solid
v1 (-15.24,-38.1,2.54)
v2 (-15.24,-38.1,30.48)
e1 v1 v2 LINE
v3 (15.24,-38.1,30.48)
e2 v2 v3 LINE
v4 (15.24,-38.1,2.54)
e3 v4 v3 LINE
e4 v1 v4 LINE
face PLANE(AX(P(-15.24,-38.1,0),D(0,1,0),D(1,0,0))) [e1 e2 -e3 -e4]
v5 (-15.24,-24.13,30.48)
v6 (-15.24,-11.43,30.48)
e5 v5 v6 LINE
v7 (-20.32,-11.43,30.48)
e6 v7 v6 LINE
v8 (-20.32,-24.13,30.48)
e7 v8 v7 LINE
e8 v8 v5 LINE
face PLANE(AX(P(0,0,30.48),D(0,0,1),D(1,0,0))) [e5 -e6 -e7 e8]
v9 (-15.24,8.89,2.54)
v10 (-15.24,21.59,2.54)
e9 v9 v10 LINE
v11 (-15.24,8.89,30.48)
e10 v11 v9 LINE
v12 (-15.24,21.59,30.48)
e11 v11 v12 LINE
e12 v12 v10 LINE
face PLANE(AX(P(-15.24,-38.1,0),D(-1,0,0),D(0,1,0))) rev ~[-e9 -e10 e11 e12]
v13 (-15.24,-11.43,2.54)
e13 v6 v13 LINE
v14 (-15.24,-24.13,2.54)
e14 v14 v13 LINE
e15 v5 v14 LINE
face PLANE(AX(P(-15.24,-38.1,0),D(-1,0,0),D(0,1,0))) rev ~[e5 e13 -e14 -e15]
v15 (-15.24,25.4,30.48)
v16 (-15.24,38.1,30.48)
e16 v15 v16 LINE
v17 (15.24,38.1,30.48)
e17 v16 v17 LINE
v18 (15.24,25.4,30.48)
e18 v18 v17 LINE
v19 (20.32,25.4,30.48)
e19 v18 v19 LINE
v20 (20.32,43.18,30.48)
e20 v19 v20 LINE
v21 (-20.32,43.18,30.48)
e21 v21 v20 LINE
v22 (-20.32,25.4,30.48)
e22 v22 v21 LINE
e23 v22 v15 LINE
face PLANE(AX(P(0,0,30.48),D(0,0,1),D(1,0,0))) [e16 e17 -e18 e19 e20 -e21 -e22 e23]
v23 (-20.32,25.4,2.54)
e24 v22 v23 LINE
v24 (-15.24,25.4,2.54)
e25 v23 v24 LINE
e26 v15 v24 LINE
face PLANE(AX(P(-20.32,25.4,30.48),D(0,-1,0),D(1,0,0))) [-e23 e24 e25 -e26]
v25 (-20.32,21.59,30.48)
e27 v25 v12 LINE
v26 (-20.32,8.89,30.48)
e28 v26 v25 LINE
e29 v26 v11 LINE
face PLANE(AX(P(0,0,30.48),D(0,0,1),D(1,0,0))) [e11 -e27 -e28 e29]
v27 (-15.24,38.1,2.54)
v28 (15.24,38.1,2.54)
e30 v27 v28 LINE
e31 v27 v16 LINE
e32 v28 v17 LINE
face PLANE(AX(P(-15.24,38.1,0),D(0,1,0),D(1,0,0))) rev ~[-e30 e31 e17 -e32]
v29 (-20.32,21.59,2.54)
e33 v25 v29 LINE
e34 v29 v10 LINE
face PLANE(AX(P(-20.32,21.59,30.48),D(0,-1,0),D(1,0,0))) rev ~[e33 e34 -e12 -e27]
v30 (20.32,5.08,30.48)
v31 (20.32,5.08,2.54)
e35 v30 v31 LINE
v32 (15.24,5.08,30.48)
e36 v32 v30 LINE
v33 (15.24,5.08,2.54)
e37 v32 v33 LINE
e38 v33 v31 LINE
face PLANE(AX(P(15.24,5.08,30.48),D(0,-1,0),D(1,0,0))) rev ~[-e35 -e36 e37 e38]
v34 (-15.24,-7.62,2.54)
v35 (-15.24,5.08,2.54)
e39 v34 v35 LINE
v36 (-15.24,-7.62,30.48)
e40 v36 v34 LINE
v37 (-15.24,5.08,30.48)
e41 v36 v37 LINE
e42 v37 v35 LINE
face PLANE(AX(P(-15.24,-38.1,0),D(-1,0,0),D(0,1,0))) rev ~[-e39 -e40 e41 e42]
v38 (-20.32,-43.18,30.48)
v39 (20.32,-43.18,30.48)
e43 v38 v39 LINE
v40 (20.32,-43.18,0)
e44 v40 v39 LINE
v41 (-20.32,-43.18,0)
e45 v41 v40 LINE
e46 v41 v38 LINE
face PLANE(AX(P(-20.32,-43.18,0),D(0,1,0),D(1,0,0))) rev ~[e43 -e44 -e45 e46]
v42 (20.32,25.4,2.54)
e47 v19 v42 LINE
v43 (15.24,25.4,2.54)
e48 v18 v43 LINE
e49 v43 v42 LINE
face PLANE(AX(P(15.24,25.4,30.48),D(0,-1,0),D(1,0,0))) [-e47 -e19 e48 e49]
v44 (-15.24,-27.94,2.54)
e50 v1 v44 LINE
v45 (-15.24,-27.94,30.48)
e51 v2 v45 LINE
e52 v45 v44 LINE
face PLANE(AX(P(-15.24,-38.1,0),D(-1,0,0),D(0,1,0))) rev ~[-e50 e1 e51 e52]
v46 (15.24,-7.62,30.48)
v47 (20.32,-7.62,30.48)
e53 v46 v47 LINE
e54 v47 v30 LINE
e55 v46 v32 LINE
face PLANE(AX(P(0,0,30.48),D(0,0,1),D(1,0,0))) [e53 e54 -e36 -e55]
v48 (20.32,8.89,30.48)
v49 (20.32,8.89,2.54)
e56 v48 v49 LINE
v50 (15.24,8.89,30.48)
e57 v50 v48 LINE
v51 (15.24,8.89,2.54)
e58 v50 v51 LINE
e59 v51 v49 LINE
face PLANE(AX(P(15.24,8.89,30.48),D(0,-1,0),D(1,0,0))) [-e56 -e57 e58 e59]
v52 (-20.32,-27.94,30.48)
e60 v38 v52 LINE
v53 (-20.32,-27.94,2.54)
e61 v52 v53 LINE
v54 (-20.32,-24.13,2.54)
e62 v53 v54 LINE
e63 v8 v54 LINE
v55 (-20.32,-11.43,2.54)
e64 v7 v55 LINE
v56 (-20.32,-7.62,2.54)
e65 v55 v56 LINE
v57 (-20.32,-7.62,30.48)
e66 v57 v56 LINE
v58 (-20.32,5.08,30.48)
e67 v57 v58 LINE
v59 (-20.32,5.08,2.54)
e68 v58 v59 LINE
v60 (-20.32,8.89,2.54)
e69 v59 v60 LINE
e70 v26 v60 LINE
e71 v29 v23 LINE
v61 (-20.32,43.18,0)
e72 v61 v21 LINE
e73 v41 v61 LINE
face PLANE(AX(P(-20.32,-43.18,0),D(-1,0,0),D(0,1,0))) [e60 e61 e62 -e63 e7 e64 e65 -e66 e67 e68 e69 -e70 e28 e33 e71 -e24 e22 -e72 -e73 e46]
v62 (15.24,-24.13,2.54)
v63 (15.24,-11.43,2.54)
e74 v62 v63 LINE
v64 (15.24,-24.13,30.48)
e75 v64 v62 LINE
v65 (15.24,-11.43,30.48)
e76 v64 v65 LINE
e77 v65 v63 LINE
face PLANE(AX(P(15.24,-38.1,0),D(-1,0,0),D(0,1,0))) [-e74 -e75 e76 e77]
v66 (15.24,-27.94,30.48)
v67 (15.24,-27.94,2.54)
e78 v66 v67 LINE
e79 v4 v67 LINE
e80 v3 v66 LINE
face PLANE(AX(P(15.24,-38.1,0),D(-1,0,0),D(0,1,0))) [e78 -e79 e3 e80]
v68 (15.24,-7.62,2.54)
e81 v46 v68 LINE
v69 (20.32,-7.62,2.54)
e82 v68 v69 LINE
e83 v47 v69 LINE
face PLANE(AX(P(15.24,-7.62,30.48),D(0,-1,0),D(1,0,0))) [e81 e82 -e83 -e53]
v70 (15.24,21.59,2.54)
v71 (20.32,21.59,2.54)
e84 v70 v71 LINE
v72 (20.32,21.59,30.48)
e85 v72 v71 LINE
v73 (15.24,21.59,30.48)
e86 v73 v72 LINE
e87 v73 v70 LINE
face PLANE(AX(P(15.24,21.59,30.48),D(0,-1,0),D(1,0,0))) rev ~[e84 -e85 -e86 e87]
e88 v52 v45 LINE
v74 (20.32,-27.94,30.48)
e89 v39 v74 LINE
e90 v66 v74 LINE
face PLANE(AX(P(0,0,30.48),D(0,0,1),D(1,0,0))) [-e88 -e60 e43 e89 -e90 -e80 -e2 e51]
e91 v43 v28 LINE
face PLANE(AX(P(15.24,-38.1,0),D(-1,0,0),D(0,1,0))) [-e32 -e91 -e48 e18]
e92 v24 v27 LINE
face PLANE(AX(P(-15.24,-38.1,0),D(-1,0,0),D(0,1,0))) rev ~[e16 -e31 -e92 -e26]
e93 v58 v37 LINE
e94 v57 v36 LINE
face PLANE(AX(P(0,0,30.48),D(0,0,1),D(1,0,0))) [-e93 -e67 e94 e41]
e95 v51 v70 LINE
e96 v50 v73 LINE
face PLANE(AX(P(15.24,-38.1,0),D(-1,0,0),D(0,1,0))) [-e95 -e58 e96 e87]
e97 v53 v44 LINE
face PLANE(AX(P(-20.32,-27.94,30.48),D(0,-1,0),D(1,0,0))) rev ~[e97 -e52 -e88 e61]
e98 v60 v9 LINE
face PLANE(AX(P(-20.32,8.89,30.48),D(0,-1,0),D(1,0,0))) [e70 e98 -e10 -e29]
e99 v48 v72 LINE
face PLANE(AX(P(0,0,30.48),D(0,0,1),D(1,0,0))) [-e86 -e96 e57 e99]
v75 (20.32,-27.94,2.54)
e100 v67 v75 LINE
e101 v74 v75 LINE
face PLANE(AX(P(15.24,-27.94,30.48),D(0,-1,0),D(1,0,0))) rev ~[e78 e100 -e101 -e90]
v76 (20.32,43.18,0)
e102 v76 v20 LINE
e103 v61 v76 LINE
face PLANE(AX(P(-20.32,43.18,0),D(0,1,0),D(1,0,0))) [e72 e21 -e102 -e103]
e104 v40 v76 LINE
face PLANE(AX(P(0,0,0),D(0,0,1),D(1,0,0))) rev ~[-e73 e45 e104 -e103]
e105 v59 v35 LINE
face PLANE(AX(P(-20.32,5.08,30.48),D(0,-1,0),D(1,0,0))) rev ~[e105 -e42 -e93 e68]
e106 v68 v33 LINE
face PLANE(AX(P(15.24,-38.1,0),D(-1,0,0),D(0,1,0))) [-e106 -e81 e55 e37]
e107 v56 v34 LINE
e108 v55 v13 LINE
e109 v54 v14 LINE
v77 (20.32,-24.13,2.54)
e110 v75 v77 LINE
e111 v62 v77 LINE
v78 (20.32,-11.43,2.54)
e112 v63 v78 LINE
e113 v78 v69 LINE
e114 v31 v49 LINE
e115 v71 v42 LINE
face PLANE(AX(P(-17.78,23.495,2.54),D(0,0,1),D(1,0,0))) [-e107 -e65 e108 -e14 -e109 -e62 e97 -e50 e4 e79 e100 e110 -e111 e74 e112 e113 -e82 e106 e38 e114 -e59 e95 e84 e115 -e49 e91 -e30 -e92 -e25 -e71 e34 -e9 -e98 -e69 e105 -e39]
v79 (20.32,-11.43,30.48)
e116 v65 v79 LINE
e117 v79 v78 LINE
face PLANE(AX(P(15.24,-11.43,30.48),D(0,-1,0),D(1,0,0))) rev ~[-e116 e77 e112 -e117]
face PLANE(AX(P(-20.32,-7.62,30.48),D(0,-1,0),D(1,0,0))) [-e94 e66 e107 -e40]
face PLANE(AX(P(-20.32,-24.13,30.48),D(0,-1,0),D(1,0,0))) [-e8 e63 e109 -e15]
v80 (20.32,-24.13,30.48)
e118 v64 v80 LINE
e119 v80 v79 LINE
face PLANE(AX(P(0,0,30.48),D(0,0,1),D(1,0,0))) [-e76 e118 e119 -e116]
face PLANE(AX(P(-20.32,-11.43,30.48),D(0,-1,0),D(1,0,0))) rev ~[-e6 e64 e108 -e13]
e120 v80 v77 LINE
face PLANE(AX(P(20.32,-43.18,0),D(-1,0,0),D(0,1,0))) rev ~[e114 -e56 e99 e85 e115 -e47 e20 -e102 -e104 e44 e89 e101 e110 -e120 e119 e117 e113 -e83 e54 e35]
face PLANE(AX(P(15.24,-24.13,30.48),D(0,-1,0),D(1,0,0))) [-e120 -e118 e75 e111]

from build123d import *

# Parameters (mm, degrees)
F0_W     = 40.64
F0_H     = 86.36
F0_W_2   = 30.48
F0_H_2   = 76.2
F1_DEPTH = 30.48
F2_DEPTH = 2.54
F3_W     = 5.08
F3_H     = 3.81
F4_DEPTH = 27.94


# Not quite as in the source:
# - a feature names something its author has since deleted; it is built from what else it names


with BuildPart() as f1:
    # F0 (on Top) → F1 (new body)
    with BuildSketch(Plane.XY):
        Rectangle(F0_W, F0_H)
        Rectangle(F0_W_2, F0_H_2, mode=Mode.SUBTRACT)
    extrude(amount=F1_DEPTH)

    # F0 (on Top) → F2 (join)
    with BuildSketch(Plane.XY):
        Rectangle(F0_W_2, F0_H_2)
    extrude(amount=F2_DEPTH)

    # F3 (on face) → F4 (cut)
    with BuildSketch(Plane.XY.offset(30.48)):
        with Locations((-17.78, 23.495)):
            Rectangle(F3_W, F3_H)
        with Locations((17.78, 23.495)):
            Rectangle(F3_W, F3_H)
        with Locations((17.78, 6.985)):
            Rectangle(F3_W, F3_H)
        with Locations((-17.78, 6.985)):
            Rectangle(F3_W, F3_H)
        with Locations((-17.78, -9.525)):
            Rectangle(F3_W, F3_H)
        with Locations((17.78, -9.525)):
            Rectangle(F3_W, F3_H)
        with Locations((-17.78, -26.035)):
            Rectangle(F3_W, F3_H)
        with Locations((17.78, -26.035)):
            Rectangle(F3_W, F3_H)
    extrude(amount=-F4_DEPTH, mode=Mode.SUBTRACT)


solid = f1.part
